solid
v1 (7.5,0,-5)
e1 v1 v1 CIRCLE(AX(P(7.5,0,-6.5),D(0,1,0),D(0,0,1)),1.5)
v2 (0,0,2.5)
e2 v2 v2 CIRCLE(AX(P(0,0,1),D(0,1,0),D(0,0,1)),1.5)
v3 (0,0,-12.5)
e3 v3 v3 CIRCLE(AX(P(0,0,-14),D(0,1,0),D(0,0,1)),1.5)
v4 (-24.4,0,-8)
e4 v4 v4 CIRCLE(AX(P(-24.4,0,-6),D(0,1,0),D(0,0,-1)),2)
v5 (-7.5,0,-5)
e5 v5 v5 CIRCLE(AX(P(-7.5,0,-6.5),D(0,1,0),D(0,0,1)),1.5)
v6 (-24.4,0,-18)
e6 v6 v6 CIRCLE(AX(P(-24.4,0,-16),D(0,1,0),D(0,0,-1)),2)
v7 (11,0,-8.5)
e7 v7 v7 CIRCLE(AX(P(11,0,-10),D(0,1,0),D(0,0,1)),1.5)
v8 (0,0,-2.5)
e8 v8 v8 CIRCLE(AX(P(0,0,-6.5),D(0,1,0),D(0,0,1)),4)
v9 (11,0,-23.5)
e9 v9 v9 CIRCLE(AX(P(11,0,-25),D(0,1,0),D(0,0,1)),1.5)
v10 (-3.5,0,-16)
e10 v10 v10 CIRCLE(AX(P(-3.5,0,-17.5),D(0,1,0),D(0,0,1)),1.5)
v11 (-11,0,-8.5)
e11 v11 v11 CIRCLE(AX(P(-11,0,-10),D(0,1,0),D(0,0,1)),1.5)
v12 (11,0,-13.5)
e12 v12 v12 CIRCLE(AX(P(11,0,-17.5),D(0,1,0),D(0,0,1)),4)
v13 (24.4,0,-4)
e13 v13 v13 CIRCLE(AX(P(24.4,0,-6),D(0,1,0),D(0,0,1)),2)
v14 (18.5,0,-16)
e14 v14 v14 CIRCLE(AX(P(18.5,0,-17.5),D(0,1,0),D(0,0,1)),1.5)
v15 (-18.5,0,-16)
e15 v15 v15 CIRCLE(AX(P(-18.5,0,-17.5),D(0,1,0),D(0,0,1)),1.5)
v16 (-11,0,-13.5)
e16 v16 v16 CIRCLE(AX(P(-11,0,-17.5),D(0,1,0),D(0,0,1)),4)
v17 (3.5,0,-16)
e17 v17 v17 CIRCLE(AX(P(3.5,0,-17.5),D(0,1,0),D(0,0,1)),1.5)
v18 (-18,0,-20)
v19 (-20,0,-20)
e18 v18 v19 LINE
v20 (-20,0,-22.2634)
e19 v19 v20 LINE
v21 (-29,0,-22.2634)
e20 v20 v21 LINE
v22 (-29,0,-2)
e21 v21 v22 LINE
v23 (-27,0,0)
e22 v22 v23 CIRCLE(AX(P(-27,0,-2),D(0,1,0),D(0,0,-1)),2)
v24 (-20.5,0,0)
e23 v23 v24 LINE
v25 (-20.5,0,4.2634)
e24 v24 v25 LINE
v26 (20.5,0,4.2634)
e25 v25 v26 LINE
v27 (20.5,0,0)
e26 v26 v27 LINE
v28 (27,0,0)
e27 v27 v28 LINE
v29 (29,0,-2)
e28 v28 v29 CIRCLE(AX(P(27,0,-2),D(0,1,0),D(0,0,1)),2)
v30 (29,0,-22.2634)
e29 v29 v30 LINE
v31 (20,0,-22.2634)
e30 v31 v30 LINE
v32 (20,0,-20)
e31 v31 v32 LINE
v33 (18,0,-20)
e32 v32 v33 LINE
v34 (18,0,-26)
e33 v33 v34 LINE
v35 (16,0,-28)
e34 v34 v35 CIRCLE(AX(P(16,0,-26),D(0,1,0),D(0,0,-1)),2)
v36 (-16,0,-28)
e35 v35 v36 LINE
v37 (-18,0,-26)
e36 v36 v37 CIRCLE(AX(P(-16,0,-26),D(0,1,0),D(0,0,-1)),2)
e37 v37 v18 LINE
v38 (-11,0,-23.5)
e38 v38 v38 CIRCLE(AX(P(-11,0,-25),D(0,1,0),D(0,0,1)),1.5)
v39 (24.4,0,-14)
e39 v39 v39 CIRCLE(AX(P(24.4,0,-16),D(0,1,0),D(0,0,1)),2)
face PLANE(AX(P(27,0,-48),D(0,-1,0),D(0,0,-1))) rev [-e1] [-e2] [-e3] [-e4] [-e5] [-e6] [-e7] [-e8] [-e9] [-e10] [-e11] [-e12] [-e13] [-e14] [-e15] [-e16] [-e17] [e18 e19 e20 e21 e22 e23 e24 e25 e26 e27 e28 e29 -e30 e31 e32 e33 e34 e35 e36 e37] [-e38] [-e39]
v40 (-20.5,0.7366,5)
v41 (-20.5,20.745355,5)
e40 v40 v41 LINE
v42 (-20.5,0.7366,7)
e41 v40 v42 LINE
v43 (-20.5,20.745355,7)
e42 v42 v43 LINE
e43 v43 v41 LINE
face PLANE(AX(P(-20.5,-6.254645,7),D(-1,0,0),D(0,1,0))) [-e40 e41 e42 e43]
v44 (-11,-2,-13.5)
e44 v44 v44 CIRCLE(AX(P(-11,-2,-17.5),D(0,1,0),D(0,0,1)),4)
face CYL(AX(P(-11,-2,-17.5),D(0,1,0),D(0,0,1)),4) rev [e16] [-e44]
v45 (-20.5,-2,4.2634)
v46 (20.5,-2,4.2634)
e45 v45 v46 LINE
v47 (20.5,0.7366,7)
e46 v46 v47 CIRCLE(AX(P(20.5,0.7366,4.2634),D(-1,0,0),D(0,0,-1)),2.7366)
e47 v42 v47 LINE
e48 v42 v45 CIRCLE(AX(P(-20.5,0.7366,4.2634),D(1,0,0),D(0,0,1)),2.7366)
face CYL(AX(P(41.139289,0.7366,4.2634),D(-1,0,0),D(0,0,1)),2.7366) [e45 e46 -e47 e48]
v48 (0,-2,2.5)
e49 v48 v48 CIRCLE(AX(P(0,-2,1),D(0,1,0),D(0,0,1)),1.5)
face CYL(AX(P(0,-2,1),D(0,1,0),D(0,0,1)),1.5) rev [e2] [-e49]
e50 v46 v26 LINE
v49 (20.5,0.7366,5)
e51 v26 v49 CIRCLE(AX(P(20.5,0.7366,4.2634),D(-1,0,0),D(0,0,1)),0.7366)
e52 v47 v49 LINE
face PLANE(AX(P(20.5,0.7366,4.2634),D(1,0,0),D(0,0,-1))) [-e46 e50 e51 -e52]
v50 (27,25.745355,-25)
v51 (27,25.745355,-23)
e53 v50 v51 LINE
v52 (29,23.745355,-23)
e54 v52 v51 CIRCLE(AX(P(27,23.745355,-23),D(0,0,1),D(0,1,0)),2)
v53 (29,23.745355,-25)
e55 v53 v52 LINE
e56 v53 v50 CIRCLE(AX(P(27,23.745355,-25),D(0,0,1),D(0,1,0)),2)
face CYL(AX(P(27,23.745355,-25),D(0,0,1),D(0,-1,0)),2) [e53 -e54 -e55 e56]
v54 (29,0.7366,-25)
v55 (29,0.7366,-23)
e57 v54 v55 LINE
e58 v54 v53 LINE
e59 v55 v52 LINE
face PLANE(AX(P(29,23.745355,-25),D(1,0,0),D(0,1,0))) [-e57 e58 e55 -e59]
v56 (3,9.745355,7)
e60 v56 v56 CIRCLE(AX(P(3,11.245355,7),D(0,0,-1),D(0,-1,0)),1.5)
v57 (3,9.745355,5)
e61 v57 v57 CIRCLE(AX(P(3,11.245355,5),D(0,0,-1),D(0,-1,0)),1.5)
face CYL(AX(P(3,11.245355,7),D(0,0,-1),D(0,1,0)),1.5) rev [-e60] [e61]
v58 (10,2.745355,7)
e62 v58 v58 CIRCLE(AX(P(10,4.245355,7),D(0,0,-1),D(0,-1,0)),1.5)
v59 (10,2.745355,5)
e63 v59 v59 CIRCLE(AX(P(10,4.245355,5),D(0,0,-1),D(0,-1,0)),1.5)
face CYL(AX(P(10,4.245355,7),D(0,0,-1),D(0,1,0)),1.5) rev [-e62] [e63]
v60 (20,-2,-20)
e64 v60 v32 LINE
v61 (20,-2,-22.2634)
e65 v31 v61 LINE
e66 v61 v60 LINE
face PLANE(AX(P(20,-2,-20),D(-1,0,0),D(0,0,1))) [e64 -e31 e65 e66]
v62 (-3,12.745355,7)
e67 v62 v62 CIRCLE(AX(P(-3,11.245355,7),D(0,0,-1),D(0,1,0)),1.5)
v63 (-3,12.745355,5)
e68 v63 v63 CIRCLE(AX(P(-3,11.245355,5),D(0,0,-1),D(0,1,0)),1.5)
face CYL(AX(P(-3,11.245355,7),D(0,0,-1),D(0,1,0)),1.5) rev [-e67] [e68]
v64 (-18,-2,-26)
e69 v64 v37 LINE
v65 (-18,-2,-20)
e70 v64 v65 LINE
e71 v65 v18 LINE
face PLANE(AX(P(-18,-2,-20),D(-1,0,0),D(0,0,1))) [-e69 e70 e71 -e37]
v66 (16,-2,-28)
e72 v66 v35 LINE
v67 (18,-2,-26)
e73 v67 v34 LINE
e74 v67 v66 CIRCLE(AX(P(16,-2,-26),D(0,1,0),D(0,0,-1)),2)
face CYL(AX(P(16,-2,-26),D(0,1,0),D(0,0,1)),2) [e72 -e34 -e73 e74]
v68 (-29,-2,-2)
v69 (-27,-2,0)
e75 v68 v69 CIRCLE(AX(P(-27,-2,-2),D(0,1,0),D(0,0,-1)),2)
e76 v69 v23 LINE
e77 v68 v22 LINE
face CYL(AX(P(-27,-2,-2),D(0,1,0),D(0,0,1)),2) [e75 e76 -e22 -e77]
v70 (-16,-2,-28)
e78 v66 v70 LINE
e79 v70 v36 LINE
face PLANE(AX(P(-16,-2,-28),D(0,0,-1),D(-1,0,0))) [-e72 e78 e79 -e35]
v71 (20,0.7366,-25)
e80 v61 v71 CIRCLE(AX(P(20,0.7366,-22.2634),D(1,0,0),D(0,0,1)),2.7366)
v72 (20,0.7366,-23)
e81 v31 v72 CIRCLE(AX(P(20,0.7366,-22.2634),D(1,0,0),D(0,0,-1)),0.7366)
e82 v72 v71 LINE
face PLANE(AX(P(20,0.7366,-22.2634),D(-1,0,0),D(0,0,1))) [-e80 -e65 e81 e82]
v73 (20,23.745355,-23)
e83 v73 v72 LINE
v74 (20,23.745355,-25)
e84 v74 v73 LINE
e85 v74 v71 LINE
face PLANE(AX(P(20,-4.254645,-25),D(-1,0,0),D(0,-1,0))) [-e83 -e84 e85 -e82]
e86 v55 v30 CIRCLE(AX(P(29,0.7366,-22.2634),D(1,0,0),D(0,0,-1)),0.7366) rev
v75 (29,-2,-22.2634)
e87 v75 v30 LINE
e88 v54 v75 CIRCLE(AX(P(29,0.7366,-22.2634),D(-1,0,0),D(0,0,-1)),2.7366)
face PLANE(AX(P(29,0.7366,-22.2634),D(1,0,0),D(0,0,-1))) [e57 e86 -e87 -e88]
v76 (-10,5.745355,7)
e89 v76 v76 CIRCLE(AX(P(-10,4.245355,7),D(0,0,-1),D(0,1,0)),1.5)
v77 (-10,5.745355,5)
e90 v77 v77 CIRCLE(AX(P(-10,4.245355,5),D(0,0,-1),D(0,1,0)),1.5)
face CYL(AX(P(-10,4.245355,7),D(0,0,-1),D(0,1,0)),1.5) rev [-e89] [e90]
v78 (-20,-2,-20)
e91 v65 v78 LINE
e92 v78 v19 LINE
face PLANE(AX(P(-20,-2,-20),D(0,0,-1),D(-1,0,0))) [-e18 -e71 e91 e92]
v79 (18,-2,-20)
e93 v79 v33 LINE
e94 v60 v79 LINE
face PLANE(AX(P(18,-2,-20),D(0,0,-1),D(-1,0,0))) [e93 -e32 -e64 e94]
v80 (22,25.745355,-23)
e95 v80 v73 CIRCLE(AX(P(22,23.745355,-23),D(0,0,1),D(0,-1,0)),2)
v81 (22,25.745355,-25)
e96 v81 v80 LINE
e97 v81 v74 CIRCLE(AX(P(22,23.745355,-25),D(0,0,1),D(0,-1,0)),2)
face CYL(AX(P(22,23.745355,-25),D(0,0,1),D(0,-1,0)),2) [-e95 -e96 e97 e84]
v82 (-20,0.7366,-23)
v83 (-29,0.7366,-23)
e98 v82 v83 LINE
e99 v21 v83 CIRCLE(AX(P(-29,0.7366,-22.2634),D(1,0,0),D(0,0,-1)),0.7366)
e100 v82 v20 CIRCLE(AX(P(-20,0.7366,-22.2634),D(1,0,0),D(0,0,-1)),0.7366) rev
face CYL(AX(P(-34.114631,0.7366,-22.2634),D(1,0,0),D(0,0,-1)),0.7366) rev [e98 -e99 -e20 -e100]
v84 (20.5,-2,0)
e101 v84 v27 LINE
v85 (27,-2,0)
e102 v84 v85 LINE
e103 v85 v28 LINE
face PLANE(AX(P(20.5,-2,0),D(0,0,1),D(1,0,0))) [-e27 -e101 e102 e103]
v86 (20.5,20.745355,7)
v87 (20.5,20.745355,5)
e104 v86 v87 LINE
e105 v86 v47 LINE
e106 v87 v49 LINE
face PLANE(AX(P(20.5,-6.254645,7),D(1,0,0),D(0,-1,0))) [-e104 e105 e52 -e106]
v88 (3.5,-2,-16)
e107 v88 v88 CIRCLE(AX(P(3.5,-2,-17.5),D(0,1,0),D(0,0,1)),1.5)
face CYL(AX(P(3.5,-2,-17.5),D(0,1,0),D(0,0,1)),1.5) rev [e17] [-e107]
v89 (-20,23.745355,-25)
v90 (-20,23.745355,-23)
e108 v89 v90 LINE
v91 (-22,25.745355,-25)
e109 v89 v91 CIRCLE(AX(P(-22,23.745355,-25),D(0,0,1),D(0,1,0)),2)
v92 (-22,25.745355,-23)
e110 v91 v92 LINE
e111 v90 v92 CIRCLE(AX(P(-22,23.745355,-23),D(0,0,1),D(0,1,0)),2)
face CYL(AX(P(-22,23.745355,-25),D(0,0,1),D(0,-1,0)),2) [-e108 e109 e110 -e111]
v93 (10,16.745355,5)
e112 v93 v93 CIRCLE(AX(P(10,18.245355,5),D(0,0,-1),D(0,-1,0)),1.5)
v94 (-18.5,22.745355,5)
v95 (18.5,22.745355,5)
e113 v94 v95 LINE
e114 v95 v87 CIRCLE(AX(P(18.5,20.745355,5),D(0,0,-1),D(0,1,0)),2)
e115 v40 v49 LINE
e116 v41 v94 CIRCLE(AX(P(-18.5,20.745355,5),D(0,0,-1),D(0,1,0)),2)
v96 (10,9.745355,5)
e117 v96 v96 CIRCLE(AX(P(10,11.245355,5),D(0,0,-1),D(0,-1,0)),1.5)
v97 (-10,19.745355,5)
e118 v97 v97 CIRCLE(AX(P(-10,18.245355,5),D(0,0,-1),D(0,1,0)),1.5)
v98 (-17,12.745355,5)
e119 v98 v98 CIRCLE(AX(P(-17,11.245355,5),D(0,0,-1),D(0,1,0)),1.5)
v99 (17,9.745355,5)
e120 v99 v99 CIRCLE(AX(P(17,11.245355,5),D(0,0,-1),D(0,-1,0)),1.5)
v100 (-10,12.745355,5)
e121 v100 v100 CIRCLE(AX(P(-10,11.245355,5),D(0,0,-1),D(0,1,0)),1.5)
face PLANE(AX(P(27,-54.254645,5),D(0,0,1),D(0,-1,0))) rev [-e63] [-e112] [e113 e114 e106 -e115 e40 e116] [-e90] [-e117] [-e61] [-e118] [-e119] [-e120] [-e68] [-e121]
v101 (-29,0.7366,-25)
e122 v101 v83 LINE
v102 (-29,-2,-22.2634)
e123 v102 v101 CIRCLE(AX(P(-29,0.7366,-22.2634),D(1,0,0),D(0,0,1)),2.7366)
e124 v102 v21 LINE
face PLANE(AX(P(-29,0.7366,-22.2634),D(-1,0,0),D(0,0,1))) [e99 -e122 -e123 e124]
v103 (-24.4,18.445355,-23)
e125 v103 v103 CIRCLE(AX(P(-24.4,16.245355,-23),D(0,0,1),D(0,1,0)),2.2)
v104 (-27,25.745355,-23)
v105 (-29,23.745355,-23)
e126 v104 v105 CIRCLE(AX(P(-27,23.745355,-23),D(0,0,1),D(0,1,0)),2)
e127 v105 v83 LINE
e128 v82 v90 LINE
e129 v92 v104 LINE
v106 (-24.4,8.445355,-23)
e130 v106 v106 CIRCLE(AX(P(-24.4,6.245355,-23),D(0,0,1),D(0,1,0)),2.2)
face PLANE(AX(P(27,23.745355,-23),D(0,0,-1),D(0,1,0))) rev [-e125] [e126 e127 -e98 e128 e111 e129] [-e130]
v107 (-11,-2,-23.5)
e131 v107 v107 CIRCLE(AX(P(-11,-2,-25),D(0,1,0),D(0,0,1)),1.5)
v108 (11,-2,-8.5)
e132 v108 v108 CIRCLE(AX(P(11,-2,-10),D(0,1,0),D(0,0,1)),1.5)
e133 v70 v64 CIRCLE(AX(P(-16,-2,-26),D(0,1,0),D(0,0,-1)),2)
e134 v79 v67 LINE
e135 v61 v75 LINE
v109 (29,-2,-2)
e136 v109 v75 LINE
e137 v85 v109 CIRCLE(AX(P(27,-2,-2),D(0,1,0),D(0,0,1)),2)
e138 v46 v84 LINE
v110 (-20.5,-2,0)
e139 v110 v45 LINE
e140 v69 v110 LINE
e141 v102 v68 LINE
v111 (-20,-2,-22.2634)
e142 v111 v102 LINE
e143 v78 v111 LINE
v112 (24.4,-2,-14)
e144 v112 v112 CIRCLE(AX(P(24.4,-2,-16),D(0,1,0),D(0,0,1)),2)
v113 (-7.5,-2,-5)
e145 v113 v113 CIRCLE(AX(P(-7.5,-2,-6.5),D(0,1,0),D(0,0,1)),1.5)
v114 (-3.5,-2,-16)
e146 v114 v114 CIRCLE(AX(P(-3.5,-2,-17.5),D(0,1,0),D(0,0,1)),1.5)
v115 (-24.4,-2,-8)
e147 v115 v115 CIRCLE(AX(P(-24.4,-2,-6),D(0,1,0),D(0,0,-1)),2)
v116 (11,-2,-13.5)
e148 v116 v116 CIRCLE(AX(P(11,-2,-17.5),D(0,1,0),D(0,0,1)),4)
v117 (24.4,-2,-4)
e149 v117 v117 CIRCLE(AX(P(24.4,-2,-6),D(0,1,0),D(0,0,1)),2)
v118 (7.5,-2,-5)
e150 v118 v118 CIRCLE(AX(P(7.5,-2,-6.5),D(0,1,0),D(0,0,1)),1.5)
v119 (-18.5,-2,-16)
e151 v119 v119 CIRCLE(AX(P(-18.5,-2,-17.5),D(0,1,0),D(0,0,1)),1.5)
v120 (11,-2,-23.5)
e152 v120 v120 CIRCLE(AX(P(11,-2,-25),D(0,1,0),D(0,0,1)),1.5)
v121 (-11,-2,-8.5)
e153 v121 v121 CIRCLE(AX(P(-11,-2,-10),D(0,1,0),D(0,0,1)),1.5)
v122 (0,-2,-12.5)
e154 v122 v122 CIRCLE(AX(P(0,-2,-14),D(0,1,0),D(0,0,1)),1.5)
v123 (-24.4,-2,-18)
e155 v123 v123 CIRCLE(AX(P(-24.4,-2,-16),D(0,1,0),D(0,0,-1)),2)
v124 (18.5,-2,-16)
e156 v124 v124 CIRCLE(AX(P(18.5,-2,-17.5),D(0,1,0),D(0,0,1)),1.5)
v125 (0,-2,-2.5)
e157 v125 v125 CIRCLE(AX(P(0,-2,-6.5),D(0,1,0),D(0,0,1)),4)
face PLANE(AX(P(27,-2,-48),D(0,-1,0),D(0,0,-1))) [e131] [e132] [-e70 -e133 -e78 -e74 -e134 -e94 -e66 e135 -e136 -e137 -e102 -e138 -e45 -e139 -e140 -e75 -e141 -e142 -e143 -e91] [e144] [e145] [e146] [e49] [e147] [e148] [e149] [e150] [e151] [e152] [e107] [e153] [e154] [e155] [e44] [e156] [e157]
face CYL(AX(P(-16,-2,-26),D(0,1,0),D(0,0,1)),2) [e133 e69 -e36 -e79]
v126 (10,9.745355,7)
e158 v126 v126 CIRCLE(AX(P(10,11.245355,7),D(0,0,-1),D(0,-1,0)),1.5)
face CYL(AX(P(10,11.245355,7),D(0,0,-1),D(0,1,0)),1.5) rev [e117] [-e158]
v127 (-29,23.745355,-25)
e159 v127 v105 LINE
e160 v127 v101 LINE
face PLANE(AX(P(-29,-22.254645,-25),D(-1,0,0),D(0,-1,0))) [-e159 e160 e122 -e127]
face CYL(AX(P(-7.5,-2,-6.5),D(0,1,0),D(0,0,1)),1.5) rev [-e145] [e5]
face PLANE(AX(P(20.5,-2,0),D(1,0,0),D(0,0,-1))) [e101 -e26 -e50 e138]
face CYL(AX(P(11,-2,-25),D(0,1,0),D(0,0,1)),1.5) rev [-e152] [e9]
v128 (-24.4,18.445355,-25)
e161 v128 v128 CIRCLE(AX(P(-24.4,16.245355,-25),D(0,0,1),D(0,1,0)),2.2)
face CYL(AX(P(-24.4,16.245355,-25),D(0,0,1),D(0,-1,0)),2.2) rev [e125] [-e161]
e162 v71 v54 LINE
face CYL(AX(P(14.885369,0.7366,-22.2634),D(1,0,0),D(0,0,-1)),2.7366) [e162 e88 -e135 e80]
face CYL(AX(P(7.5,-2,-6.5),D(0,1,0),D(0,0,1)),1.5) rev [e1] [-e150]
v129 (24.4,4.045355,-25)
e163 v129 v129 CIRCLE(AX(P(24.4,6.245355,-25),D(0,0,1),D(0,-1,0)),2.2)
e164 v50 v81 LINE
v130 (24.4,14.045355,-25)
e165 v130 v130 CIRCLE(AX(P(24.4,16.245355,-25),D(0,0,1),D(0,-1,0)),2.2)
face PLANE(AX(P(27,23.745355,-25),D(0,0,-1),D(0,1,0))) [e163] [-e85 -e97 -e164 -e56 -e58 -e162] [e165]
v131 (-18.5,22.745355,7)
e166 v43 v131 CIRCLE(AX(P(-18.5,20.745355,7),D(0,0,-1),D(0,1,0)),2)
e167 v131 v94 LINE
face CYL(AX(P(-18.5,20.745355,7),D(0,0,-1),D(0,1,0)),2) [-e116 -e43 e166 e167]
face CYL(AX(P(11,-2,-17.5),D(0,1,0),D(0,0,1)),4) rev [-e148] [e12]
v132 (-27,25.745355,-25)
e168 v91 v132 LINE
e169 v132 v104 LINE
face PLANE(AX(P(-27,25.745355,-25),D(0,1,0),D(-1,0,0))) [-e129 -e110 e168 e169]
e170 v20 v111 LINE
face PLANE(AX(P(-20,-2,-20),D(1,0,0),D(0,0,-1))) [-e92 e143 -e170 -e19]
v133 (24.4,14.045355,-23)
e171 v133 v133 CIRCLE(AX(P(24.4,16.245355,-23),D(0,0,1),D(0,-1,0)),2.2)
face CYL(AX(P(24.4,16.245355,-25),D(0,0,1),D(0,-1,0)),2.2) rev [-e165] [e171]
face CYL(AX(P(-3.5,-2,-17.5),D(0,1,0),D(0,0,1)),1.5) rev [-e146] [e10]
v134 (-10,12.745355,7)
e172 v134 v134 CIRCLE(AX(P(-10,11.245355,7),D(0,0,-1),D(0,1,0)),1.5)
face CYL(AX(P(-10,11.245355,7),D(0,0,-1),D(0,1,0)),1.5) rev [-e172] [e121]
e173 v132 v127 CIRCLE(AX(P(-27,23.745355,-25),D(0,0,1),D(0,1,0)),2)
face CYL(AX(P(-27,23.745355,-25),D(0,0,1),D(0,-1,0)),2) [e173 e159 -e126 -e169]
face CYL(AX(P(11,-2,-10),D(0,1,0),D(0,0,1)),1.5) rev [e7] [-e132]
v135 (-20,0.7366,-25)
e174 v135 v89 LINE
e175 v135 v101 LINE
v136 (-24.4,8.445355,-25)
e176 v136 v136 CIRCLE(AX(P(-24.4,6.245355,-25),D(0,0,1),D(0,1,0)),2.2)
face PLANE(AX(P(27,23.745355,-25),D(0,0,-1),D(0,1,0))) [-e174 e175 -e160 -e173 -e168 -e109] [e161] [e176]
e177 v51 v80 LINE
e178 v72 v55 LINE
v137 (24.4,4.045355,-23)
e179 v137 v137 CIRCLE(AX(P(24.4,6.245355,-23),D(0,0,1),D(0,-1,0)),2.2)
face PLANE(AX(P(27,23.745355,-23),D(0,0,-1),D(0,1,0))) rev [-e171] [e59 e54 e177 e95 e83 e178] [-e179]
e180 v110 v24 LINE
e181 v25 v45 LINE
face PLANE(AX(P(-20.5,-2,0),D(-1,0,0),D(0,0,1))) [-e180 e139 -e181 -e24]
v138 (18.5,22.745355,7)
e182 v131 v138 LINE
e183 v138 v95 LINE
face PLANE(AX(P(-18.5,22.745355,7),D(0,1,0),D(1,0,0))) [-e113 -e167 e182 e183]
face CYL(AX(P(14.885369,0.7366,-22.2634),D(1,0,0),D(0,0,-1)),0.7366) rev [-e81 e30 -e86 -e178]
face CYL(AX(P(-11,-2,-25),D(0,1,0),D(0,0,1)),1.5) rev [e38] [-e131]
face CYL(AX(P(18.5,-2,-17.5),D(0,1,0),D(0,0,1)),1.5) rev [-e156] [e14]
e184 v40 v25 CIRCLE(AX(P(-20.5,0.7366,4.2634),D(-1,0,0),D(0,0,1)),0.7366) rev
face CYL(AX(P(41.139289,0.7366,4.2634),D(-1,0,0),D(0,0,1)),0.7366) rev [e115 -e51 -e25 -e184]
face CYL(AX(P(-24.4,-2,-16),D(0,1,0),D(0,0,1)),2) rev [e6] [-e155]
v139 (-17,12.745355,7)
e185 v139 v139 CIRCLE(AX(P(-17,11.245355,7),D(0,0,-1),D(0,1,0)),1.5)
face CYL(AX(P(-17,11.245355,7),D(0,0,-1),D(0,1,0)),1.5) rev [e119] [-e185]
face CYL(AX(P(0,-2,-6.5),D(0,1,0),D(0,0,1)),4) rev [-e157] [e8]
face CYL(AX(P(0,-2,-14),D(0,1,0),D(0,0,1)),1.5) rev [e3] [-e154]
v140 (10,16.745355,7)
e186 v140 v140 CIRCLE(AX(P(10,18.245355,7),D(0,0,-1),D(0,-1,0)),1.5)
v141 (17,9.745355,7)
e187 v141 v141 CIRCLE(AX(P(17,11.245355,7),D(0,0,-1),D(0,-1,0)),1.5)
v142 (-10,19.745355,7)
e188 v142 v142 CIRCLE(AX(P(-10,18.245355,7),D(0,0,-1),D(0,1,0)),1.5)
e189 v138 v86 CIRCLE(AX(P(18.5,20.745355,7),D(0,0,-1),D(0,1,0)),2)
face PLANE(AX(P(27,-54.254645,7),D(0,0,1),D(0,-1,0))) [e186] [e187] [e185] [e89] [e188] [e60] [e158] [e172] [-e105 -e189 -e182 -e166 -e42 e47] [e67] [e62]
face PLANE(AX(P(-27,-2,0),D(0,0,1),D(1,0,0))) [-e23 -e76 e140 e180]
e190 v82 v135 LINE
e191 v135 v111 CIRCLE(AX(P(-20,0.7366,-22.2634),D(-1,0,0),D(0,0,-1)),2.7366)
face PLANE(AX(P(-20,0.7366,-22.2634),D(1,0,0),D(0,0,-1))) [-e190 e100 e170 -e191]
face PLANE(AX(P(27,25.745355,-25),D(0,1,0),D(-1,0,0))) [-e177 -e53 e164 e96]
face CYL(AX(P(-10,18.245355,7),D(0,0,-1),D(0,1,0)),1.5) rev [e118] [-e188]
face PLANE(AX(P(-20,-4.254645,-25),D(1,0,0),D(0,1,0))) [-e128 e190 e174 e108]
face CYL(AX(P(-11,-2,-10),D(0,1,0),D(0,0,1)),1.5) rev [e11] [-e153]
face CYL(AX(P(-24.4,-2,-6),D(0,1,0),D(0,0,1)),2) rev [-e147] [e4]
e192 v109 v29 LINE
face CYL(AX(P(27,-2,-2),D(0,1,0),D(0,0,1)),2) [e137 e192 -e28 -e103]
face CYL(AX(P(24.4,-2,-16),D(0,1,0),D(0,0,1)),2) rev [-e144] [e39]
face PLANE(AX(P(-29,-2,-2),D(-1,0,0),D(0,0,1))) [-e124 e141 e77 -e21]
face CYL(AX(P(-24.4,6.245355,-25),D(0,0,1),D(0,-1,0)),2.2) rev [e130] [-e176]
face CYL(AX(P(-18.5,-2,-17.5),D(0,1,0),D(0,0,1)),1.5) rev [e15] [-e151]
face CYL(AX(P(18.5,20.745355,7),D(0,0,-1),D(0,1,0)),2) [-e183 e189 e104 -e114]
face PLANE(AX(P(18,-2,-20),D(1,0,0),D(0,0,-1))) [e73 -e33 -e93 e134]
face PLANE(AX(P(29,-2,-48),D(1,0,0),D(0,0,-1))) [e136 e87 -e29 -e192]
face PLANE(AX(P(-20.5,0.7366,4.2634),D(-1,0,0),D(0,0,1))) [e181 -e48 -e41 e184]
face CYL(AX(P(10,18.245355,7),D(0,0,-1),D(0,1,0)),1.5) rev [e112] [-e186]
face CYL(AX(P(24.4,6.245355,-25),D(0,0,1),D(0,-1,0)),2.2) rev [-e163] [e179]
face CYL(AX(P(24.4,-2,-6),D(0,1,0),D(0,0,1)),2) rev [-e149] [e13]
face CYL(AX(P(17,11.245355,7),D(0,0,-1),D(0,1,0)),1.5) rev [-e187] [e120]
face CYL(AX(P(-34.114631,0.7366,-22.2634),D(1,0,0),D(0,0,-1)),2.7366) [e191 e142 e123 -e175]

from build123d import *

# Parameters (mm, degrees)
SKETCH1_R                    = 1.5
SKETCH1_R_2                  = 2.2
SKETCH1_R_3                  = 2
SKETCH1_R_4                  = 4
BASE_FLANGE1_DEPTH           = 2
SKETCHED_START               = -20.5
SKETCHED_BEND1_DEPTH         = 41
SKETCHED_START_2             = -29
SKETCHED_BEND1_2_DEPTH       = 9
SKETCHED_START_3             = 20
SKETCHED_BEND1_3_DEPTH       = 9
SKETCHED_BEND1_4_DEPTH       = 41
SKETCHED_BEND1_5_DEPTH       = 9
SKETCHED_BEND1_6_DEPTH       = 9
SKETCHED_START_4             = -25
SKETCHED_BEND1_7_OUTLINE_R   = 1.5
SKETCHED_BEND1_7_OUTLINE_R_2 = 2.2
SKETCHED_BEND1_7_DEPTH       = 32
SKETCHED_START_5             = 5
SKETCHED_BEND1_8_DEPTH       = 2


with BuildPart() as part:
    # Base-Flange1: sheet metal written as solids
    # Sketch1 → Base-Flange1 (new body)
    with BuildSketch(Plane(origin=(0, 0, 0), x_dir=(1, 0, 0), z_dir=(0, 1, 0))):
        with BuildLine():
            Line((-27, 0), (-20.5, 0))
            Line((-20.5, 0), (-20.5, -27))
            ThreePointArc((-20.5, -27), (-19.914213562, -28.414213562), (-18.5, -29))
            Line((-18.5, -29), (18.5, -29))
            ThreePointArc((18.5, -29), (19.914213562, -28.414213562), (20.5, -27))
            Line((20.5, -27), (20.5, 0))
            Line((20.5, 0), (27, 0))
            ThreePointArc((27, 0), (28.414213562, 0.585786438), (29, 2))
            Line((29, 2), (29, 48))
            ThreePointArc((29, 48), (28.414213562, 49.414213562), (27, 50))
            Line((27, 50), (22, 50))
            ThreePointArc((22, 50), (20.585786438, 49.414213562), (20, 48))
            Line((20, 48), (20, 20))
            Line((20, 20), (18, 20))
            Line((18, 20), (18, 26))
            ThreePointArc((18, 26), (17.414213562, 27.414213562), (16, 28))
            Line((16, 28), (-16, 28))
            ThreePointArc((-16, 28), (-17.414213562, 27.414213562), (-18, 26))
            Line((-18, 26), (-18, 20))
            Line((-18, 20), (-20, 20))
            Line((-20, 20), (-20, 48))
            ThreePointArc((-20, 48), (-20.585786438, 49.414213562), (-22, 50))
            Line((-22, 50), (-27, 50))
            ThreePointArc((-27, 50), (-28.414213562, 49.414213562), (-29, 48))
            Line((-29, 48), (-29, 2))
            ThreePointArc((-29, 2), (-28.414213562, 0.585786438), (-27, 0))
        make_face()
        with Locations(Location((-17, -17.5, 0), (0, 0, 270))):
            Circle(SKETCH1_R, mode=Mode.SUBTRACT)
        with Locations(Location((-10, -17.5, 0), (0, 0, 270))):
            Circle(SKETCH1_R, mode=Mode.SUBTRACT)
        with Locations(Location((-10, -10.5, 0), (0, 0, 270))):
            Circle(SKETCH1_R, mode=Mode.SUBTRACT)
        with Locations(Location((-3, -17.5, 0), (0, 0, 270))):
            Circle(SKETCH1_R, mode=Mode.SUBTRACT)
        with Locations(Location((-10, -24.5, 0), (0, 0, 270))):
            Circle(SKETCH1_R, mode=Mode.SUBTRACT)
        with Locations(Location((24.4, 40.5, 0), (0, 0, 270))):
            Circle(SKETCH1_R_2, mode=Mode.SUBTRACT)
        with Locations(Location((24.4, 30.5, 0), (0, 0, 270))):
            Circle(SKETCH1_R_2, mode=Mode.SUBTRACT)
        with Locations(Location((-24.4, 30.5, 0), (0, 0, 90))):
            Circle(SKETCH1_R_2, mode=Mode.SUBTRACT)
        with Locations(Location((-24.4, 40.5, 0), (0, 0, 90))):
            Circle(SKETCH1_R_2, mode=Mode.SUBTRACT)
        with Locations(Location((24.4, 6, 0), (0, 0, 270))):
            Circle(SKETCH1_R_3, mode=Mode.SUBTRACT)
        with Locations(Location((24.4, 16, 0), (0, 0, 270))):
            Circle(SKETCH1_R_3, mode=Mode.SUBTRACT)
        with Locations(Location((-24.4, 16, 0), (0, 0, 90))):
            Circle(SKETCH1_R_3, mode=Mode.SUBTRACT)
        with Locations(Location((-24.4, 6, 0), (0, 0, 90))):
            Circle(SKETCH1_R_3, mode=Mode.SUBTRACT)
        with Locations(Location((0, -1, 0), (0, 0, 270))):
            Circle(SKETCH1_R, mode=Mode.SUBTRACT)
        with Locations(Location((0, 6.5, 0), (0, 0, 270))):
            Circle(SKETCH1_R_4, mode=Mode.SUBTRACT)
        with Locations(Location((-7.5, 6.5, 0), (0, 0, 270))):
            Circle(SKETCH1_R, mode=Mode.SUBTRACT)
        with Locations(Location((0, 14, 0), (0, 0, 270))):
            Circle(SKETCH1_R, mode=Mode.SUBTRACT)
        with Locations(Location((7.5, 6.5, 0), (0, 0, 270))):
            Circle(SKETCH1_R, mode=Mode.SUBTRACT)
        with Locations(Location((-3.5, 17.5, 0), (0, 0, 270))):
            Circle(SKETCH1_R, mode=Mode.SUBTRACT)
        with Locations(Location((-11, 17.5, 0), (0, 0, 270))):
            Circle(SKETCH1_R_4, mode=Mode.SUBTRACT)
        with Locations(Location((-11, 25, 0), (0, 0, 270))):
            Circle(SKETCH1_R, mode=Mode.SUBTRACT)
        with Locations(Location((-18.5, 17.5, 0), (0, 0, 270))):
            Circle(SKETCH1_R, mode=Mode.SUBTRACT)
        with Locations(Location((-11, 10, 0), (0, 0, 270))):
            Circle(SKETCH1_R, mode=Mode.SUBTRACT)
        with Locations(Location((3.5, 17.5, 0), (0, 0, 270))):
            Circle(SKETCH1_R, mode=Mode.SUBTRACT)
        with Locations(Location((11, 17.5, 0), (0, 0, 270))):
            Circle(SKETCH1_R_4, mode=Mode.SUBTRACT)
        with Locations(Location((11, 10, 0), (0, 0, 270))):
            Circle(SKETCH1_R, mode=Mode.SUBTRACT)
        with Locations(Location((18.5, 17.5, 0), (0, 0, 270))):
            Circle(SKETCH1_R, mode=Mode.SUBTRACT)
        with Locations(Location((11, 25, 0), (0, 0, 270))):
            Circle(SKETCH1_R, mode=Mode.SUBTRACT)
        with Locations(Location((10, -10.5, 0), (0, 0, 90))):
            Circle(SKETCH1_R, mode=Mode.SUBTRACT)
        with Locations(Location((10, -24.5, 0), (0, 0, 90))):
            Circle(SKETCH1_R, mode=Mode.SUBTRACT)
        with Locations(Location((3, -17.5, 0), (0, 0, 90))):
            Circle(SKETCH1_R, mode=Mode.SUBTRACT)
        with Locations(Location((10, -17.5, 0), (0, 0, 90))):
            Circle(SKETCH1_R, mode=Mode.SUBTRACT)
        with Locations(Location((17, -17.5, 0), (0, 0, 90))):
            Circle(SKETCH1_R, mode=Mode.SUBTRACT)
    extrude(amount=-BASE_FLANGE1_DEPTH)

    # Sketched Bend1: read off the stored shape, not the designer's step
    # Sketched Bend1 outline → Sketched Bend1 (cut)
    with BuildSketch(Plane.YZ.offset(SKETCHED_START)):
        with BuildLine():
            Line((-2, 29), (-2, 4.2634))
            ThreePointArc((-2, 4.2634), (-1.443395312, 5.917667209), (0, 6.899002398))
            Line((0, 6.899002398), (0, 29))
            Line((0, 29), (-2, 29))
        make_face()
    extrude(amount=SKETCHED_BEND1_DEPTH, mode=Mode.SUBTRACT)

    # Sketched Bend1 2 outline → Sketched Bend1 2 (cut)
    with BuildSketch(Plane.YZ.offset(SKETCHED_START_2)):
        with BuildLine():
            ThreePointArc((0, -24.899002398), (-1.443395312, -23.917667209), (-2, -22.2634))
            Line((-2, -22.2634), (-2, -50))
            Line((-2, -50), (0, -50))
            Line((0, -50), (0, -24.899002398))
        make_face()
    extrude(amount=SKETCHED_BEND1_2_DEPTH, mode=Mode.SUBTRACT)

    # Sketched Bend1 3 outline → Sketched Bend1 3 (cut)
    with BuildSketch(Plane.YZ.offset(SKETCHED_START_3)):
        with BuildLine():
            ThreePointArc((0, -24.899002398), (-1.443395312, -23.917667209), (-2, -22.2634))
            Line((-2, -22.2634), (-2, -50))
            Line((-2, -50), (0, -50))
            Line((0, -50), (0, -24.899002398))
        make_face()
    extrude(amount=SKETCHED_BEND1_3_DEPTH, mode=Mode.SUBTRACT)

    # Sketched Bend1 4 outline → Sketched Bend1 4 (add)
    with BuildSketch(Plane.YZ.offset(SKETCHED_START)):
        with BuildLine():
            ThreePointArc((0.7366, 7), (0.364854094, 6.974633029), (0, 6.899002398))
            Line((0, 6.899002398), (0, 4.2634))
            ThreePointArc((0, 4.2634), (0.215745145, 4.784254855), (0.7366, 5))
            Line((0.7366, 5), (22.745355099, 5))
            Line((22.745355099, 5), (22.745355099, 7))
            Line((22.745355099, 7), (0.7366, 7))
        make_face()
    extrude(amount=SKETCHED_BEND1_4_DEPTH)

    # Sketched Bend1 5 outline → Sketched Bend1 5 (add)
    with BuildSketch(Plane.YZ.offset(SKETCHED_START_2)):
        with BuildLine():
            Line((0, -22.2634), (0, -24.899002398))
            ThreePointArc((0, -24.899002398), (0.364854094, -24.974633029), (0.7366, -25))
            Line((0.7366, -25), (25.745355099, -25))
            Line((25.745355099, -25), (25.745355099, -23))
            Line((25.745355099, -23), (0.7366, -23))
            ThreePointArc((0.7366, -23), (0.215745145, -22.784254855), (0, -22.2634))
        make_face()
    extrude(amount=SKETCHED_BEND1_5_DEPTH)

    # Sketched Bend1 6 outline → Sketched Bend1 6 (add)
    with BuildSketch(Plane.YZ.offset(SKETCHED_START_3)):
        with BuildLine():
            Line((0, -22.2634), (0, -24.899002398))
            ThreePointArc((0, -24.899002398), (0.364854094, -24.974633029), (0.7366, -25))
            Line((0.7366, -25), (25.745355099, -25))
            Line((25.745355099, -25), (25.745355099, -23))
            Line((25.745355099, -23), (0.7366, -23))
            ThreePointArc((0.7366, -23), (0.215745145, -22.784254855), (0, -22.2634))
        make_face()
    extrude(amount=SKETCHED_BEND1_6_DEPTH)

    # Sketched Bend1 7 outline → Sketched Bend1 7 (cut)
    with BuildSketch(Plane.XY.offset(SKETCHED_START_4)):
        with BuildLine():
            ThreePointArc((-29, 23.745355099), (-28.414213562, 25.159568661), (-27, 25.745355099))
            Line((-27, 25.745355099), (-29, 25.745355099))
            Line((-29, 25.745355099), (-29, 23.745355099))
        make_face()
        with BuildLine():
            ThreePointArc((-22, 25.745355099), (-20.585786438, 25.159568661), (-20, 23.745355099))
            Line((-20, 23.745355099), (-20, 25.745355099))
            Line((-20, 25.745355099), (-22, 25.745355099))
        make_face()
        with BuildLine():
            Line((29, 25.745355099), (27, 25.745355099))
            ThreePointArc((27, 25.745355099), (28.414213562, 25.159568661), (29, 23.745355099))
            Line((29, 23.745355099), (29, 25.745355099))
        make_face()
        with BuildLine():
            Line((20, 25.745355099), (20, 23.745355099))
            ThreePointArc((20, 23.745355099), (20.585786438, 25.159568661), (22, 25.745355099))
            Line((22, 25.745355099), (20, 25.745355099))
        make_face()
        with BuildLine():
            Line((20, 22.745355099), (18.5, 22.745355099))
            ThreePointArc((18.5, 22.745355099), (19.322875656, 22.568230754), (20, 22.068230754))
            Line((20, 22.068230754), (20, 22.745355099))
        make_face()
        with BuildLine():
            Line((-20, 22.745355099), (-20, 22.068230754))
            ThreePointArc((-20, 22.068230754), (-19.322875656, 22.568230754), (-18.5, 22.745355099))
            Line((-18.5, 22.745355099), (-20, 22.745355099))
        make_face()
        with Locations((17, 11.245355099)):
            Circle(SKETCHED_BEND1_7_OUTLINE_R)
        with Locations((-10, 18.245355099)):
            Circle(SKETCHED_BEND1_7_OUTLINE_R)
        with Locations((-3, 11.245355099)):
            Circle(SKETCHED_BEND1_7_OUTLINE_R)
        with Locations((-10, 4.245355099)):
            Circle(SKETCHED_BEND1_7_OUTLINE_R)
        with Locations((-17, 11.245355099)):
            Circle(SKETCHED_BEND1_7_OUTLINE_R)
        with Locations((10, 11.245355099)):
            Circle(SKETCHED_BEND1_7_OUTLINE_R)
        with Locations((3, 11.245355099)):
            Circle(SKETCHED_BEND1_7_OUTLINE_R)
        with Locations((10, 18.245355099)):
            Circle(SKETCHED_BEND1_7_OUTLINE_R)
        with Locations((-10, 11.245355099)):
            Circle(SKETCHED_BEND1_7_OUTLINE_R)
        with Locations((10, 4.245355099)):
            Circle(SKETCHED_BEND1_7_OUTLINE_R)
        with Locations((24.4, 16.245355099)):
            Circle(SKETCHED_BEND1_7_OUTLINE_R_2)
        with Locations((24.4, 6.245355099)):
            Circle(SKETCHED_BEND1_7_OUTLINE_R_2)
        with Locations((-24.4, 6.245355099)):
            Circle(SKETCHED_BEND1_7_OUTLINE_R_2)
        with Locations((-24.4, 16.245355099)):
            Circle(SKETCHED_BEND1_7_OUTLINE_R_2)
    extrude(amount=SKETCHED_BEND1_7_DEPTH, mode=Mode.SUBTRACT)

    # Sketched Bend1 8 outline → Sketched Bend1 8 (cut)
    with BuildSketch(Plane.XY.offset(SKETCHED_START_5)):
        with BuildLine():
            Line((-20.5, 22.745355099), (-20.5, 20.745355099))
            ThreePointArc((-20.5, 20.745355099), (-20.370828693, 21.45246188), (-20, 22.068230754))
            Line((-20, 22.068230754), (-20, 22.745355099))
            Line((-20, 22.745355099), (-20.5, 22.745355099))
        make_face()
        with BuildLine():
            Line((20, 22.745355099), (20, 22.068230754))
            ThreePointArc((20, 22.068230754), (20.370828693, 21.45246188), (20.5, 20.745355099))
            Line((20.5, 20.745355099), (20.5, 22.745355099))
            Line((20.5, 22.745355099), (20, 22.745355099))
        make_face()
    extrude(amount=SKETCHED_BEND1_8_DEPTH, mode=Mode.SUBTRACT)


solid = part.part
